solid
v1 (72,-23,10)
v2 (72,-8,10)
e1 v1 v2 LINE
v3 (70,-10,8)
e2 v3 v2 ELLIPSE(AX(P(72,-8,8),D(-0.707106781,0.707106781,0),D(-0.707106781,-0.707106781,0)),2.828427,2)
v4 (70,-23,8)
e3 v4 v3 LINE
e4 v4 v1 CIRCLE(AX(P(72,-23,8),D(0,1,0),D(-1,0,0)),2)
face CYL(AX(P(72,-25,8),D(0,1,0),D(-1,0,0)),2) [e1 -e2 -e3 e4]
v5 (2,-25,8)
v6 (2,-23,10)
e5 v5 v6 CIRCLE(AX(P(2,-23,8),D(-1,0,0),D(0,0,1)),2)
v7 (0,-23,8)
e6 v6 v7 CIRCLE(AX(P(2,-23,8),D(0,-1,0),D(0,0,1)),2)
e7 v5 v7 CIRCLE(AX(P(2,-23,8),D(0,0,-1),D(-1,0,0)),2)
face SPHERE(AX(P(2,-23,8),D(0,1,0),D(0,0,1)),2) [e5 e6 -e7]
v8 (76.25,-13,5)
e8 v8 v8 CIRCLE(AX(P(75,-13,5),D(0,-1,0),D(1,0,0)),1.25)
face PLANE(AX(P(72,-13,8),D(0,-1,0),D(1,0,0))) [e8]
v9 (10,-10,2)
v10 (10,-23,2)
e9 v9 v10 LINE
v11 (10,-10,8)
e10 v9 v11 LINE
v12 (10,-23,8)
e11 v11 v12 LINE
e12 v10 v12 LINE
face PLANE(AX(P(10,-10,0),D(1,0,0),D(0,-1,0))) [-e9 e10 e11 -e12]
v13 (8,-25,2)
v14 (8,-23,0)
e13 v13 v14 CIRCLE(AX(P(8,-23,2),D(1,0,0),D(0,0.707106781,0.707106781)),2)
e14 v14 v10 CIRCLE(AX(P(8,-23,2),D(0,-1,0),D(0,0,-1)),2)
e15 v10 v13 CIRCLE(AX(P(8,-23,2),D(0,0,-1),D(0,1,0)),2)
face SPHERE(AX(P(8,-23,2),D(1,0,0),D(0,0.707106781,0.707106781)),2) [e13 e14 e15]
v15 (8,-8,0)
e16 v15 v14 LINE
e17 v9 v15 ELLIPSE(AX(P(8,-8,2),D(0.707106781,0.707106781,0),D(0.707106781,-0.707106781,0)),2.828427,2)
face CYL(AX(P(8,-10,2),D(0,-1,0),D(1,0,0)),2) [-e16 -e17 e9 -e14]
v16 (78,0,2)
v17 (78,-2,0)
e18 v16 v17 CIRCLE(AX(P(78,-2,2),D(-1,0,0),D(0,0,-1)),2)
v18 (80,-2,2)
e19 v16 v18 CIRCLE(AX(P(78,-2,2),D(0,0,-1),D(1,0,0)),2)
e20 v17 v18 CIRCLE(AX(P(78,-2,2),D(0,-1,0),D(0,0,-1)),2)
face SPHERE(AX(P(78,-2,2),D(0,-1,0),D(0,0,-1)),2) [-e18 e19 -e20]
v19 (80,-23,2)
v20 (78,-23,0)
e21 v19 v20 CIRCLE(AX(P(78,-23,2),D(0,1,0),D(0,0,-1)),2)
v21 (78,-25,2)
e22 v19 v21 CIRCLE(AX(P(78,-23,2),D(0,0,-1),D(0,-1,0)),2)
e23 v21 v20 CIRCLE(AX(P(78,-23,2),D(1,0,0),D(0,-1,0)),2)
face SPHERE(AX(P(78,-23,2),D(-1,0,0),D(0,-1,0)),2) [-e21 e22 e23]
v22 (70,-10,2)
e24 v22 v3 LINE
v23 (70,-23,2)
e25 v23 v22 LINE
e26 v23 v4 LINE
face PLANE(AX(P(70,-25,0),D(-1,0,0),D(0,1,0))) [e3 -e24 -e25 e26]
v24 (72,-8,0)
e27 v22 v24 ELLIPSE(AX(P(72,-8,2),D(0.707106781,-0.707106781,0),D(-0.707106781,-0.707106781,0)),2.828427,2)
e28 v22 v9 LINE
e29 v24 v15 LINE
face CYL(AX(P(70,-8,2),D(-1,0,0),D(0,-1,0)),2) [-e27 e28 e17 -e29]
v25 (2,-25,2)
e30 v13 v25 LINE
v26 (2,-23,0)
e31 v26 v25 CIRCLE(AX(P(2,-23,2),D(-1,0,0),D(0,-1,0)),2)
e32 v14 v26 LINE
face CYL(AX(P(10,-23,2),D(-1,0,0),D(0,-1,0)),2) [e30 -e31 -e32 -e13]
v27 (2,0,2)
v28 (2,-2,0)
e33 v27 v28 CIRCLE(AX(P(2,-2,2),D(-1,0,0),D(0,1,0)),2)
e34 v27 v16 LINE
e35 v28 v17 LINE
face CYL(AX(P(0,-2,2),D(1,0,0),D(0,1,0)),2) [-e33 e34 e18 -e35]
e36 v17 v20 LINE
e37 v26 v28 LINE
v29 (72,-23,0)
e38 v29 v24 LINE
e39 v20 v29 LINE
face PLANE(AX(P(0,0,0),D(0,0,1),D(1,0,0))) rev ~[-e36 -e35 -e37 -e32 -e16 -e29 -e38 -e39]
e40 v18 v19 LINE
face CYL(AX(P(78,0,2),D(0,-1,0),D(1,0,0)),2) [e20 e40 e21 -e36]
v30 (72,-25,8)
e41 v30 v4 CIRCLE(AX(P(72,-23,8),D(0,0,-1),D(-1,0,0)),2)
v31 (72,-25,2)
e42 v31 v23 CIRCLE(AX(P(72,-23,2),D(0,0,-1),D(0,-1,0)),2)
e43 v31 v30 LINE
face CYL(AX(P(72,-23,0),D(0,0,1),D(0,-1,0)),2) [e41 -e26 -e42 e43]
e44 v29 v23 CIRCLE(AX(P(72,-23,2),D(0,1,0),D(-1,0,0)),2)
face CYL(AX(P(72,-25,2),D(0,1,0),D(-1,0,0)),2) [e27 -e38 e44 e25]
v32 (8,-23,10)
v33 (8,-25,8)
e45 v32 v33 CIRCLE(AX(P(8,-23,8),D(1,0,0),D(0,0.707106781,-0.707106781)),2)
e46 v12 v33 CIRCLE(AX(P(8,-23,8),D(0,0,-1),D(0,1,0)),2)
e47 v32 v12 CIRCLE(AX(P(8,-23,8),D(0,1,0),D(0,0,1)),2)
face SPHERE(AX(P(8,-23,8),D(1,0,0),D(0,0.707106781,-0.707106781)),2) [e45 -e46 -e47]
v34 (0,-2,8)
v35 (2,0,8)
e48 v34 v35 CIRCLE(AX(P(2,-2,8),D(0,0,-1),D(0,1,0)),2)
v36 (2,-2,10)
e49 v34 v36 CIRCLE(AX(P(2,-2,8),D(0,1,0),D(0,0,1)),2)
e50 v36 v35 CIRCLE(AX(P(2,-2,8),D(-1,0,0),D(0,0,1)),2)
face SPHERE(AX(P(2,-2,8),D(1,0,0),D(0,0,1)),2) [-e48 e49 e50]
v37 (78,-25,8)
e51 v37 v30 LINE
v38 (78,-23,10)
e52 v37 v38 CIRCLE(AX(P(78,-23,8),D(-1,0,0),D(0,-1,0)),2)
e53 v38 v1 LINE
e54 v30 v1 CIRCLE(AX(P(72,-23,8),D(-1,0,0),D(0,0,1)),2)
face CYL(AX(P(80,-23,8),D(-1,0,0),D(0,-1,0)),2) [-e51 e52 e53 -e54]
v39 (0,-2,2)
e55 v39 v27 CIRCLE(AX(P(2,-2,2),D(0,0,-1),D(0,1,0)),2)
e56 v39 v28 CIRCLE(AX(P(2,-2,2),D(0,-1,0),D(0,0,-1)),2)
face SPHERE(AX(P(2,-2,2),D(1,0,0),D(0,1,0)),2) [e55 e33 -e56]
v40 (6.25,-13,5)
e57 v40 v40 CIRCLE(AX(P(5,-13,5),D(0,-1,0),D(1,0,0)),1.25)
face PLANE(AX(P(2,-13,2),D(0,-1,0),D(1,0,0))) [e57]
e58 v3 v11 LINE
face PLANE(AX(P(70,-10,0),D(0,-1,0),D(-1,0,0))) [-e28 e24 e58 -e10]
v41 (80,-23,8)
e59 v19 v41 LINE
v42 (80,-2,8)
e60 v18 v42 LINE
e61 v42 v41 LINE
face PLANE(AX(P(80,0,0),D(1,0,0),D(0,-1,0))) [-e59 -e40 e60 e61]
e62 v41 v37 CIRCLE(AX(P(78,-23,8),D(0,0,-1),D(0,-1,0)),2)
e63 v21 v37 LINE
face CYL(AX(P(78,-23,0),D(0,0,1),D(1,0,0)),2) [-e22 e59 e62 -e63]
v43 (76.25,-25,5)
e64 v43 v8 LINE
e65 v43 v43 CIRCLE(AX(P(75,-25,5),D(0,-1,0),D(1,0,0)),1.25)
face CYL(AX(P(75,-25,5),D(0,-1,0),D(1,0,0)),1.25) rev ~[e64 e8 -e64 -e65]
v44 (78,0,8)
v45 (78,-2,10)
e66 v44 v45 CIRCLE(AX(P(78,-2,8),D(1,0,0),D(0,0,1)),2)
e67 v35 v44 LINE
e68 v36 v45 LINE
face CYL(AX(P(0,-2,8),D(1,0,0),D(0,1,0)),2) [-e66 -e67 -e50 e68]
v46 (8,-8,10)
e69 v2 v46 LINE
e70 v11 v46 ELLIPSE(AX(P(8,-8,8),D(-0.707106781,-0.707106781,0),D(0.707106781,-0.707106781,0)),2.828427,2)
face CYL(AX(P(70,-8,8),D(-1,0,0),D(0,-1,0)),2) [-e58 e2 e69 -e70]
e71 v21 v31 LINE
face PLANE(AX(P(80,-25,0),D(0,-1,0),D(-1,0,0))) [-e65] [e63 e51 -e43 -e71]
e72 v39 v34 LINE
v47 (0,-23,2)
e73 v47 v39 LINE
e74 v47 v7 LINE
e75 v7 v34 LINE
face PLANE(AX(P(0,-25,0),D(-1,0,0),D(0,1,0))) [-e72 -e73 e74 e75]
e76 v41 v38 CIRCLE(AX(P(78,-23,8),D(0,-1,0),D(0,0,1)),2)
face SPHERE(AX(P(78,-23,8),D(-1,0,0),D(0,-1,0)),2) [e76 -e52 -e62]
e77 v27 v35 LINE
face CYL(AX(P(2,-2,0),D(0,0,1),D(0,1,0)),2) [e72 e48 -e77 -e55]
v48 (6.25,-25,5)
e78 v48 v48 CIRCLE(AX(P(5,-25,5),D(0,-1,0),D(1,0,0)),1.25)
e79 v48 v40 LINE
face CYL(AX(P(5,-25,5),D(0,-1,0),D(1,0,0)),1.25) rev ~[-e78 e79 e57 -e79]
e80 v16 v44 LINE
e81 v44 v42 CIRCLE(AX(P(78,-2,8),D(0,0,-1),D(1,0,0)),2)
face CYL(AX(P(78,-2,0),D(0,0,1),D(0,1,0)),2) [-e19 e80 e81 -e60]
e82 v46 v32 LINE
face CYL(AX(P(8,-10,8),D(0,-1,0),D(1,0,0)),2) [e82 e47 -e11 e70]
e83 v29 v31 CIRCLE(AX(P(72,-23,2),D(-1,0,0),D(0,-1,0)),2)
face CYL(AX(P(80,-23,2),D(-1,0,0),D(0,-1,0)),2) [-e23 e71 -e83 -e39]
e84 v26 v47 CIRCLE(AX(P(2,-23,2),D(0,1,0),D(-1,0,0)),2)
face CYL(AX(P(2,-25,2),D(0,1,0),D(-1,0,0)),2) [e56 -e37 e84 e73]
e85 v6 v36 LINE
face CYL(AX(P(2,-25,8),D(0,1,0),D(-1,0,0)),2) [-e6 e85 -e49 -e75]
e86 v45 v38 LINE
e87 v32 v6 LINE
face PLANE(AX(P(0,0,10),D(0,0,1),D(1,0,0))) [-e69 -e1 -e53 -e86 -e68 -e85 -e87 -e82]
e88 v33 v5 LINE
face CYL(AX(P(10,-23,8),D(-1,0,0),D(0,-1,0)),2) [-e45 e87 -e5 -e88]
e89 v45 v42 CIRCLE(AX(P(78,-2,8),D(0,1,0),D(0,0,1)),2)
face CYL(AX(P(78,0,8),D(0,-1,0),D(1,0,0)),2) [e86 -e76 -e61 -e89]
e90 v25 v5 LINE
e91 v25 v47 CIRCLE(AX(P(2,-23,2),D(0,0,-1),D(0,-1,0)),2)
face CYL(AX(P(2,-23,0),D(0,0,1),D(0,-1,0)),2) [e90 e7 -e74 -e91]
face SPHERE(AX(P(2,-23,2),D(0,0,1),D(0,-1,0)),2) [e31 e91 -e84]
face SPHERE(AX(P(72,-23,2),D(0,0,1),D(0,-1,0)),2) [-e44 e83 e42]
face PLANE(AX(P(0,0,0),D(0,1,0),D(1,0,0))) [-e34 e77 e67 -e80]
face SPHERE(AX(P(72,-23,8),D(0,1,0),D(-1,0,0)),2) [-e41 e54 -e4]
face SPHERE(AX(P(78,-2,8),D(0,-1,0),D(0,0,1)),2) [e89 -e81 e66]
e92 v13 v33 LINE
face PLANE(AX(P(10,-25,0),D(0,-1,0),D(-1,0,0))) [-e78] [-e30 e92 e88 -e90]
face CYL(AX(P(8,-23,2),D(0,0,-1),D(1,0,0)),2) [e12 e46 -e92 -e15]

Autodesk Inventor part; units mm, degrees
ref_plane "YZ Plane" through (0, 0, 0) normal (1, 0, 0) x (0, 1, 0)
ref_plane "XZ Plane" through (0, 0, 0) normal (0, 1, 0) x (-1, 0, 0)
ref_plane "XY Plane" through (0, 0, 0) normal (0, 0, 1) x (1, 0, 0)
sketch "Boceto1" plane through (0, 0, 0) normal (0, 0, 1) x (1, 0, 0)
  line L0 (0, 0) -> (80, 0)
  line L1 (80, 0) -> (80, -25)
  line L2 (80, -25) -> (70, -25)
  line L3 (70, -25) -> (70, -10)
  line L4 (70, -10) -> (10, -10)
  line L5 (10, -10) -> (10, -25)
  line L6 (10, -25) -> (0, -25)
  line L7 (0, -25) -> (0, 0)
  dimension "d0" = 10
  dimension "d1" = 80
  dimension "d2" = 10
  dimension "d3" = 15
  dimension "d4" = 25
  dimension "d6" = 25
extrude "Extrusión1" add sketch "Boceto1" along normal blind 10
fillet "Empalme1" radius 2 21 edges at (10, -17.5, 10) (40, -10, 10) (70, -17.5, 10) (10, -17.5, 0) (40, -10, 0) (70, -25, 5) (75, -25, 10) (75, -25, 0) (80, -25, 5) (80, -12.5, 10) (80, -12.5, 0) (40, 0, 10) (0, -12.5, 10) (5, -25, 10) (0, -25, 5) (5, -25, 0) (40, 0, 0) (80, 0, 5) (0, 0, 5) (0, -12.5, 0) (70, -17.5, 0)
sketch "Boceto2" plane through (72, -25, 8) normal (0, -1, 0) x (1, 0, 0)
  circle A0 centre (3, -3) radius 1.25
  point P0 (-72, -8)
  dimension "d10" = 2.5
extrude "Extrusión2" cut sketch "Boceto2" against normal blind 12
fillet "Empalme2" radius 2 3 edges at (9.4142, -24.4142, 9.4142) (9.4142, -24.4142, 0.5858) (10, -25, 5)
sketch "Boceto4" plane through (2, -25, 2) normal (0, -1, 0) x (1, 0, 0)
  circle A0 centre (3, 3) radius 1.25
  point P0 (-2, -2)
  dimension "d18" = 2.5
extrude "Extrusión4" cut sketch "Boceto4" against normal blind 12
properties part number "maneta porta"
